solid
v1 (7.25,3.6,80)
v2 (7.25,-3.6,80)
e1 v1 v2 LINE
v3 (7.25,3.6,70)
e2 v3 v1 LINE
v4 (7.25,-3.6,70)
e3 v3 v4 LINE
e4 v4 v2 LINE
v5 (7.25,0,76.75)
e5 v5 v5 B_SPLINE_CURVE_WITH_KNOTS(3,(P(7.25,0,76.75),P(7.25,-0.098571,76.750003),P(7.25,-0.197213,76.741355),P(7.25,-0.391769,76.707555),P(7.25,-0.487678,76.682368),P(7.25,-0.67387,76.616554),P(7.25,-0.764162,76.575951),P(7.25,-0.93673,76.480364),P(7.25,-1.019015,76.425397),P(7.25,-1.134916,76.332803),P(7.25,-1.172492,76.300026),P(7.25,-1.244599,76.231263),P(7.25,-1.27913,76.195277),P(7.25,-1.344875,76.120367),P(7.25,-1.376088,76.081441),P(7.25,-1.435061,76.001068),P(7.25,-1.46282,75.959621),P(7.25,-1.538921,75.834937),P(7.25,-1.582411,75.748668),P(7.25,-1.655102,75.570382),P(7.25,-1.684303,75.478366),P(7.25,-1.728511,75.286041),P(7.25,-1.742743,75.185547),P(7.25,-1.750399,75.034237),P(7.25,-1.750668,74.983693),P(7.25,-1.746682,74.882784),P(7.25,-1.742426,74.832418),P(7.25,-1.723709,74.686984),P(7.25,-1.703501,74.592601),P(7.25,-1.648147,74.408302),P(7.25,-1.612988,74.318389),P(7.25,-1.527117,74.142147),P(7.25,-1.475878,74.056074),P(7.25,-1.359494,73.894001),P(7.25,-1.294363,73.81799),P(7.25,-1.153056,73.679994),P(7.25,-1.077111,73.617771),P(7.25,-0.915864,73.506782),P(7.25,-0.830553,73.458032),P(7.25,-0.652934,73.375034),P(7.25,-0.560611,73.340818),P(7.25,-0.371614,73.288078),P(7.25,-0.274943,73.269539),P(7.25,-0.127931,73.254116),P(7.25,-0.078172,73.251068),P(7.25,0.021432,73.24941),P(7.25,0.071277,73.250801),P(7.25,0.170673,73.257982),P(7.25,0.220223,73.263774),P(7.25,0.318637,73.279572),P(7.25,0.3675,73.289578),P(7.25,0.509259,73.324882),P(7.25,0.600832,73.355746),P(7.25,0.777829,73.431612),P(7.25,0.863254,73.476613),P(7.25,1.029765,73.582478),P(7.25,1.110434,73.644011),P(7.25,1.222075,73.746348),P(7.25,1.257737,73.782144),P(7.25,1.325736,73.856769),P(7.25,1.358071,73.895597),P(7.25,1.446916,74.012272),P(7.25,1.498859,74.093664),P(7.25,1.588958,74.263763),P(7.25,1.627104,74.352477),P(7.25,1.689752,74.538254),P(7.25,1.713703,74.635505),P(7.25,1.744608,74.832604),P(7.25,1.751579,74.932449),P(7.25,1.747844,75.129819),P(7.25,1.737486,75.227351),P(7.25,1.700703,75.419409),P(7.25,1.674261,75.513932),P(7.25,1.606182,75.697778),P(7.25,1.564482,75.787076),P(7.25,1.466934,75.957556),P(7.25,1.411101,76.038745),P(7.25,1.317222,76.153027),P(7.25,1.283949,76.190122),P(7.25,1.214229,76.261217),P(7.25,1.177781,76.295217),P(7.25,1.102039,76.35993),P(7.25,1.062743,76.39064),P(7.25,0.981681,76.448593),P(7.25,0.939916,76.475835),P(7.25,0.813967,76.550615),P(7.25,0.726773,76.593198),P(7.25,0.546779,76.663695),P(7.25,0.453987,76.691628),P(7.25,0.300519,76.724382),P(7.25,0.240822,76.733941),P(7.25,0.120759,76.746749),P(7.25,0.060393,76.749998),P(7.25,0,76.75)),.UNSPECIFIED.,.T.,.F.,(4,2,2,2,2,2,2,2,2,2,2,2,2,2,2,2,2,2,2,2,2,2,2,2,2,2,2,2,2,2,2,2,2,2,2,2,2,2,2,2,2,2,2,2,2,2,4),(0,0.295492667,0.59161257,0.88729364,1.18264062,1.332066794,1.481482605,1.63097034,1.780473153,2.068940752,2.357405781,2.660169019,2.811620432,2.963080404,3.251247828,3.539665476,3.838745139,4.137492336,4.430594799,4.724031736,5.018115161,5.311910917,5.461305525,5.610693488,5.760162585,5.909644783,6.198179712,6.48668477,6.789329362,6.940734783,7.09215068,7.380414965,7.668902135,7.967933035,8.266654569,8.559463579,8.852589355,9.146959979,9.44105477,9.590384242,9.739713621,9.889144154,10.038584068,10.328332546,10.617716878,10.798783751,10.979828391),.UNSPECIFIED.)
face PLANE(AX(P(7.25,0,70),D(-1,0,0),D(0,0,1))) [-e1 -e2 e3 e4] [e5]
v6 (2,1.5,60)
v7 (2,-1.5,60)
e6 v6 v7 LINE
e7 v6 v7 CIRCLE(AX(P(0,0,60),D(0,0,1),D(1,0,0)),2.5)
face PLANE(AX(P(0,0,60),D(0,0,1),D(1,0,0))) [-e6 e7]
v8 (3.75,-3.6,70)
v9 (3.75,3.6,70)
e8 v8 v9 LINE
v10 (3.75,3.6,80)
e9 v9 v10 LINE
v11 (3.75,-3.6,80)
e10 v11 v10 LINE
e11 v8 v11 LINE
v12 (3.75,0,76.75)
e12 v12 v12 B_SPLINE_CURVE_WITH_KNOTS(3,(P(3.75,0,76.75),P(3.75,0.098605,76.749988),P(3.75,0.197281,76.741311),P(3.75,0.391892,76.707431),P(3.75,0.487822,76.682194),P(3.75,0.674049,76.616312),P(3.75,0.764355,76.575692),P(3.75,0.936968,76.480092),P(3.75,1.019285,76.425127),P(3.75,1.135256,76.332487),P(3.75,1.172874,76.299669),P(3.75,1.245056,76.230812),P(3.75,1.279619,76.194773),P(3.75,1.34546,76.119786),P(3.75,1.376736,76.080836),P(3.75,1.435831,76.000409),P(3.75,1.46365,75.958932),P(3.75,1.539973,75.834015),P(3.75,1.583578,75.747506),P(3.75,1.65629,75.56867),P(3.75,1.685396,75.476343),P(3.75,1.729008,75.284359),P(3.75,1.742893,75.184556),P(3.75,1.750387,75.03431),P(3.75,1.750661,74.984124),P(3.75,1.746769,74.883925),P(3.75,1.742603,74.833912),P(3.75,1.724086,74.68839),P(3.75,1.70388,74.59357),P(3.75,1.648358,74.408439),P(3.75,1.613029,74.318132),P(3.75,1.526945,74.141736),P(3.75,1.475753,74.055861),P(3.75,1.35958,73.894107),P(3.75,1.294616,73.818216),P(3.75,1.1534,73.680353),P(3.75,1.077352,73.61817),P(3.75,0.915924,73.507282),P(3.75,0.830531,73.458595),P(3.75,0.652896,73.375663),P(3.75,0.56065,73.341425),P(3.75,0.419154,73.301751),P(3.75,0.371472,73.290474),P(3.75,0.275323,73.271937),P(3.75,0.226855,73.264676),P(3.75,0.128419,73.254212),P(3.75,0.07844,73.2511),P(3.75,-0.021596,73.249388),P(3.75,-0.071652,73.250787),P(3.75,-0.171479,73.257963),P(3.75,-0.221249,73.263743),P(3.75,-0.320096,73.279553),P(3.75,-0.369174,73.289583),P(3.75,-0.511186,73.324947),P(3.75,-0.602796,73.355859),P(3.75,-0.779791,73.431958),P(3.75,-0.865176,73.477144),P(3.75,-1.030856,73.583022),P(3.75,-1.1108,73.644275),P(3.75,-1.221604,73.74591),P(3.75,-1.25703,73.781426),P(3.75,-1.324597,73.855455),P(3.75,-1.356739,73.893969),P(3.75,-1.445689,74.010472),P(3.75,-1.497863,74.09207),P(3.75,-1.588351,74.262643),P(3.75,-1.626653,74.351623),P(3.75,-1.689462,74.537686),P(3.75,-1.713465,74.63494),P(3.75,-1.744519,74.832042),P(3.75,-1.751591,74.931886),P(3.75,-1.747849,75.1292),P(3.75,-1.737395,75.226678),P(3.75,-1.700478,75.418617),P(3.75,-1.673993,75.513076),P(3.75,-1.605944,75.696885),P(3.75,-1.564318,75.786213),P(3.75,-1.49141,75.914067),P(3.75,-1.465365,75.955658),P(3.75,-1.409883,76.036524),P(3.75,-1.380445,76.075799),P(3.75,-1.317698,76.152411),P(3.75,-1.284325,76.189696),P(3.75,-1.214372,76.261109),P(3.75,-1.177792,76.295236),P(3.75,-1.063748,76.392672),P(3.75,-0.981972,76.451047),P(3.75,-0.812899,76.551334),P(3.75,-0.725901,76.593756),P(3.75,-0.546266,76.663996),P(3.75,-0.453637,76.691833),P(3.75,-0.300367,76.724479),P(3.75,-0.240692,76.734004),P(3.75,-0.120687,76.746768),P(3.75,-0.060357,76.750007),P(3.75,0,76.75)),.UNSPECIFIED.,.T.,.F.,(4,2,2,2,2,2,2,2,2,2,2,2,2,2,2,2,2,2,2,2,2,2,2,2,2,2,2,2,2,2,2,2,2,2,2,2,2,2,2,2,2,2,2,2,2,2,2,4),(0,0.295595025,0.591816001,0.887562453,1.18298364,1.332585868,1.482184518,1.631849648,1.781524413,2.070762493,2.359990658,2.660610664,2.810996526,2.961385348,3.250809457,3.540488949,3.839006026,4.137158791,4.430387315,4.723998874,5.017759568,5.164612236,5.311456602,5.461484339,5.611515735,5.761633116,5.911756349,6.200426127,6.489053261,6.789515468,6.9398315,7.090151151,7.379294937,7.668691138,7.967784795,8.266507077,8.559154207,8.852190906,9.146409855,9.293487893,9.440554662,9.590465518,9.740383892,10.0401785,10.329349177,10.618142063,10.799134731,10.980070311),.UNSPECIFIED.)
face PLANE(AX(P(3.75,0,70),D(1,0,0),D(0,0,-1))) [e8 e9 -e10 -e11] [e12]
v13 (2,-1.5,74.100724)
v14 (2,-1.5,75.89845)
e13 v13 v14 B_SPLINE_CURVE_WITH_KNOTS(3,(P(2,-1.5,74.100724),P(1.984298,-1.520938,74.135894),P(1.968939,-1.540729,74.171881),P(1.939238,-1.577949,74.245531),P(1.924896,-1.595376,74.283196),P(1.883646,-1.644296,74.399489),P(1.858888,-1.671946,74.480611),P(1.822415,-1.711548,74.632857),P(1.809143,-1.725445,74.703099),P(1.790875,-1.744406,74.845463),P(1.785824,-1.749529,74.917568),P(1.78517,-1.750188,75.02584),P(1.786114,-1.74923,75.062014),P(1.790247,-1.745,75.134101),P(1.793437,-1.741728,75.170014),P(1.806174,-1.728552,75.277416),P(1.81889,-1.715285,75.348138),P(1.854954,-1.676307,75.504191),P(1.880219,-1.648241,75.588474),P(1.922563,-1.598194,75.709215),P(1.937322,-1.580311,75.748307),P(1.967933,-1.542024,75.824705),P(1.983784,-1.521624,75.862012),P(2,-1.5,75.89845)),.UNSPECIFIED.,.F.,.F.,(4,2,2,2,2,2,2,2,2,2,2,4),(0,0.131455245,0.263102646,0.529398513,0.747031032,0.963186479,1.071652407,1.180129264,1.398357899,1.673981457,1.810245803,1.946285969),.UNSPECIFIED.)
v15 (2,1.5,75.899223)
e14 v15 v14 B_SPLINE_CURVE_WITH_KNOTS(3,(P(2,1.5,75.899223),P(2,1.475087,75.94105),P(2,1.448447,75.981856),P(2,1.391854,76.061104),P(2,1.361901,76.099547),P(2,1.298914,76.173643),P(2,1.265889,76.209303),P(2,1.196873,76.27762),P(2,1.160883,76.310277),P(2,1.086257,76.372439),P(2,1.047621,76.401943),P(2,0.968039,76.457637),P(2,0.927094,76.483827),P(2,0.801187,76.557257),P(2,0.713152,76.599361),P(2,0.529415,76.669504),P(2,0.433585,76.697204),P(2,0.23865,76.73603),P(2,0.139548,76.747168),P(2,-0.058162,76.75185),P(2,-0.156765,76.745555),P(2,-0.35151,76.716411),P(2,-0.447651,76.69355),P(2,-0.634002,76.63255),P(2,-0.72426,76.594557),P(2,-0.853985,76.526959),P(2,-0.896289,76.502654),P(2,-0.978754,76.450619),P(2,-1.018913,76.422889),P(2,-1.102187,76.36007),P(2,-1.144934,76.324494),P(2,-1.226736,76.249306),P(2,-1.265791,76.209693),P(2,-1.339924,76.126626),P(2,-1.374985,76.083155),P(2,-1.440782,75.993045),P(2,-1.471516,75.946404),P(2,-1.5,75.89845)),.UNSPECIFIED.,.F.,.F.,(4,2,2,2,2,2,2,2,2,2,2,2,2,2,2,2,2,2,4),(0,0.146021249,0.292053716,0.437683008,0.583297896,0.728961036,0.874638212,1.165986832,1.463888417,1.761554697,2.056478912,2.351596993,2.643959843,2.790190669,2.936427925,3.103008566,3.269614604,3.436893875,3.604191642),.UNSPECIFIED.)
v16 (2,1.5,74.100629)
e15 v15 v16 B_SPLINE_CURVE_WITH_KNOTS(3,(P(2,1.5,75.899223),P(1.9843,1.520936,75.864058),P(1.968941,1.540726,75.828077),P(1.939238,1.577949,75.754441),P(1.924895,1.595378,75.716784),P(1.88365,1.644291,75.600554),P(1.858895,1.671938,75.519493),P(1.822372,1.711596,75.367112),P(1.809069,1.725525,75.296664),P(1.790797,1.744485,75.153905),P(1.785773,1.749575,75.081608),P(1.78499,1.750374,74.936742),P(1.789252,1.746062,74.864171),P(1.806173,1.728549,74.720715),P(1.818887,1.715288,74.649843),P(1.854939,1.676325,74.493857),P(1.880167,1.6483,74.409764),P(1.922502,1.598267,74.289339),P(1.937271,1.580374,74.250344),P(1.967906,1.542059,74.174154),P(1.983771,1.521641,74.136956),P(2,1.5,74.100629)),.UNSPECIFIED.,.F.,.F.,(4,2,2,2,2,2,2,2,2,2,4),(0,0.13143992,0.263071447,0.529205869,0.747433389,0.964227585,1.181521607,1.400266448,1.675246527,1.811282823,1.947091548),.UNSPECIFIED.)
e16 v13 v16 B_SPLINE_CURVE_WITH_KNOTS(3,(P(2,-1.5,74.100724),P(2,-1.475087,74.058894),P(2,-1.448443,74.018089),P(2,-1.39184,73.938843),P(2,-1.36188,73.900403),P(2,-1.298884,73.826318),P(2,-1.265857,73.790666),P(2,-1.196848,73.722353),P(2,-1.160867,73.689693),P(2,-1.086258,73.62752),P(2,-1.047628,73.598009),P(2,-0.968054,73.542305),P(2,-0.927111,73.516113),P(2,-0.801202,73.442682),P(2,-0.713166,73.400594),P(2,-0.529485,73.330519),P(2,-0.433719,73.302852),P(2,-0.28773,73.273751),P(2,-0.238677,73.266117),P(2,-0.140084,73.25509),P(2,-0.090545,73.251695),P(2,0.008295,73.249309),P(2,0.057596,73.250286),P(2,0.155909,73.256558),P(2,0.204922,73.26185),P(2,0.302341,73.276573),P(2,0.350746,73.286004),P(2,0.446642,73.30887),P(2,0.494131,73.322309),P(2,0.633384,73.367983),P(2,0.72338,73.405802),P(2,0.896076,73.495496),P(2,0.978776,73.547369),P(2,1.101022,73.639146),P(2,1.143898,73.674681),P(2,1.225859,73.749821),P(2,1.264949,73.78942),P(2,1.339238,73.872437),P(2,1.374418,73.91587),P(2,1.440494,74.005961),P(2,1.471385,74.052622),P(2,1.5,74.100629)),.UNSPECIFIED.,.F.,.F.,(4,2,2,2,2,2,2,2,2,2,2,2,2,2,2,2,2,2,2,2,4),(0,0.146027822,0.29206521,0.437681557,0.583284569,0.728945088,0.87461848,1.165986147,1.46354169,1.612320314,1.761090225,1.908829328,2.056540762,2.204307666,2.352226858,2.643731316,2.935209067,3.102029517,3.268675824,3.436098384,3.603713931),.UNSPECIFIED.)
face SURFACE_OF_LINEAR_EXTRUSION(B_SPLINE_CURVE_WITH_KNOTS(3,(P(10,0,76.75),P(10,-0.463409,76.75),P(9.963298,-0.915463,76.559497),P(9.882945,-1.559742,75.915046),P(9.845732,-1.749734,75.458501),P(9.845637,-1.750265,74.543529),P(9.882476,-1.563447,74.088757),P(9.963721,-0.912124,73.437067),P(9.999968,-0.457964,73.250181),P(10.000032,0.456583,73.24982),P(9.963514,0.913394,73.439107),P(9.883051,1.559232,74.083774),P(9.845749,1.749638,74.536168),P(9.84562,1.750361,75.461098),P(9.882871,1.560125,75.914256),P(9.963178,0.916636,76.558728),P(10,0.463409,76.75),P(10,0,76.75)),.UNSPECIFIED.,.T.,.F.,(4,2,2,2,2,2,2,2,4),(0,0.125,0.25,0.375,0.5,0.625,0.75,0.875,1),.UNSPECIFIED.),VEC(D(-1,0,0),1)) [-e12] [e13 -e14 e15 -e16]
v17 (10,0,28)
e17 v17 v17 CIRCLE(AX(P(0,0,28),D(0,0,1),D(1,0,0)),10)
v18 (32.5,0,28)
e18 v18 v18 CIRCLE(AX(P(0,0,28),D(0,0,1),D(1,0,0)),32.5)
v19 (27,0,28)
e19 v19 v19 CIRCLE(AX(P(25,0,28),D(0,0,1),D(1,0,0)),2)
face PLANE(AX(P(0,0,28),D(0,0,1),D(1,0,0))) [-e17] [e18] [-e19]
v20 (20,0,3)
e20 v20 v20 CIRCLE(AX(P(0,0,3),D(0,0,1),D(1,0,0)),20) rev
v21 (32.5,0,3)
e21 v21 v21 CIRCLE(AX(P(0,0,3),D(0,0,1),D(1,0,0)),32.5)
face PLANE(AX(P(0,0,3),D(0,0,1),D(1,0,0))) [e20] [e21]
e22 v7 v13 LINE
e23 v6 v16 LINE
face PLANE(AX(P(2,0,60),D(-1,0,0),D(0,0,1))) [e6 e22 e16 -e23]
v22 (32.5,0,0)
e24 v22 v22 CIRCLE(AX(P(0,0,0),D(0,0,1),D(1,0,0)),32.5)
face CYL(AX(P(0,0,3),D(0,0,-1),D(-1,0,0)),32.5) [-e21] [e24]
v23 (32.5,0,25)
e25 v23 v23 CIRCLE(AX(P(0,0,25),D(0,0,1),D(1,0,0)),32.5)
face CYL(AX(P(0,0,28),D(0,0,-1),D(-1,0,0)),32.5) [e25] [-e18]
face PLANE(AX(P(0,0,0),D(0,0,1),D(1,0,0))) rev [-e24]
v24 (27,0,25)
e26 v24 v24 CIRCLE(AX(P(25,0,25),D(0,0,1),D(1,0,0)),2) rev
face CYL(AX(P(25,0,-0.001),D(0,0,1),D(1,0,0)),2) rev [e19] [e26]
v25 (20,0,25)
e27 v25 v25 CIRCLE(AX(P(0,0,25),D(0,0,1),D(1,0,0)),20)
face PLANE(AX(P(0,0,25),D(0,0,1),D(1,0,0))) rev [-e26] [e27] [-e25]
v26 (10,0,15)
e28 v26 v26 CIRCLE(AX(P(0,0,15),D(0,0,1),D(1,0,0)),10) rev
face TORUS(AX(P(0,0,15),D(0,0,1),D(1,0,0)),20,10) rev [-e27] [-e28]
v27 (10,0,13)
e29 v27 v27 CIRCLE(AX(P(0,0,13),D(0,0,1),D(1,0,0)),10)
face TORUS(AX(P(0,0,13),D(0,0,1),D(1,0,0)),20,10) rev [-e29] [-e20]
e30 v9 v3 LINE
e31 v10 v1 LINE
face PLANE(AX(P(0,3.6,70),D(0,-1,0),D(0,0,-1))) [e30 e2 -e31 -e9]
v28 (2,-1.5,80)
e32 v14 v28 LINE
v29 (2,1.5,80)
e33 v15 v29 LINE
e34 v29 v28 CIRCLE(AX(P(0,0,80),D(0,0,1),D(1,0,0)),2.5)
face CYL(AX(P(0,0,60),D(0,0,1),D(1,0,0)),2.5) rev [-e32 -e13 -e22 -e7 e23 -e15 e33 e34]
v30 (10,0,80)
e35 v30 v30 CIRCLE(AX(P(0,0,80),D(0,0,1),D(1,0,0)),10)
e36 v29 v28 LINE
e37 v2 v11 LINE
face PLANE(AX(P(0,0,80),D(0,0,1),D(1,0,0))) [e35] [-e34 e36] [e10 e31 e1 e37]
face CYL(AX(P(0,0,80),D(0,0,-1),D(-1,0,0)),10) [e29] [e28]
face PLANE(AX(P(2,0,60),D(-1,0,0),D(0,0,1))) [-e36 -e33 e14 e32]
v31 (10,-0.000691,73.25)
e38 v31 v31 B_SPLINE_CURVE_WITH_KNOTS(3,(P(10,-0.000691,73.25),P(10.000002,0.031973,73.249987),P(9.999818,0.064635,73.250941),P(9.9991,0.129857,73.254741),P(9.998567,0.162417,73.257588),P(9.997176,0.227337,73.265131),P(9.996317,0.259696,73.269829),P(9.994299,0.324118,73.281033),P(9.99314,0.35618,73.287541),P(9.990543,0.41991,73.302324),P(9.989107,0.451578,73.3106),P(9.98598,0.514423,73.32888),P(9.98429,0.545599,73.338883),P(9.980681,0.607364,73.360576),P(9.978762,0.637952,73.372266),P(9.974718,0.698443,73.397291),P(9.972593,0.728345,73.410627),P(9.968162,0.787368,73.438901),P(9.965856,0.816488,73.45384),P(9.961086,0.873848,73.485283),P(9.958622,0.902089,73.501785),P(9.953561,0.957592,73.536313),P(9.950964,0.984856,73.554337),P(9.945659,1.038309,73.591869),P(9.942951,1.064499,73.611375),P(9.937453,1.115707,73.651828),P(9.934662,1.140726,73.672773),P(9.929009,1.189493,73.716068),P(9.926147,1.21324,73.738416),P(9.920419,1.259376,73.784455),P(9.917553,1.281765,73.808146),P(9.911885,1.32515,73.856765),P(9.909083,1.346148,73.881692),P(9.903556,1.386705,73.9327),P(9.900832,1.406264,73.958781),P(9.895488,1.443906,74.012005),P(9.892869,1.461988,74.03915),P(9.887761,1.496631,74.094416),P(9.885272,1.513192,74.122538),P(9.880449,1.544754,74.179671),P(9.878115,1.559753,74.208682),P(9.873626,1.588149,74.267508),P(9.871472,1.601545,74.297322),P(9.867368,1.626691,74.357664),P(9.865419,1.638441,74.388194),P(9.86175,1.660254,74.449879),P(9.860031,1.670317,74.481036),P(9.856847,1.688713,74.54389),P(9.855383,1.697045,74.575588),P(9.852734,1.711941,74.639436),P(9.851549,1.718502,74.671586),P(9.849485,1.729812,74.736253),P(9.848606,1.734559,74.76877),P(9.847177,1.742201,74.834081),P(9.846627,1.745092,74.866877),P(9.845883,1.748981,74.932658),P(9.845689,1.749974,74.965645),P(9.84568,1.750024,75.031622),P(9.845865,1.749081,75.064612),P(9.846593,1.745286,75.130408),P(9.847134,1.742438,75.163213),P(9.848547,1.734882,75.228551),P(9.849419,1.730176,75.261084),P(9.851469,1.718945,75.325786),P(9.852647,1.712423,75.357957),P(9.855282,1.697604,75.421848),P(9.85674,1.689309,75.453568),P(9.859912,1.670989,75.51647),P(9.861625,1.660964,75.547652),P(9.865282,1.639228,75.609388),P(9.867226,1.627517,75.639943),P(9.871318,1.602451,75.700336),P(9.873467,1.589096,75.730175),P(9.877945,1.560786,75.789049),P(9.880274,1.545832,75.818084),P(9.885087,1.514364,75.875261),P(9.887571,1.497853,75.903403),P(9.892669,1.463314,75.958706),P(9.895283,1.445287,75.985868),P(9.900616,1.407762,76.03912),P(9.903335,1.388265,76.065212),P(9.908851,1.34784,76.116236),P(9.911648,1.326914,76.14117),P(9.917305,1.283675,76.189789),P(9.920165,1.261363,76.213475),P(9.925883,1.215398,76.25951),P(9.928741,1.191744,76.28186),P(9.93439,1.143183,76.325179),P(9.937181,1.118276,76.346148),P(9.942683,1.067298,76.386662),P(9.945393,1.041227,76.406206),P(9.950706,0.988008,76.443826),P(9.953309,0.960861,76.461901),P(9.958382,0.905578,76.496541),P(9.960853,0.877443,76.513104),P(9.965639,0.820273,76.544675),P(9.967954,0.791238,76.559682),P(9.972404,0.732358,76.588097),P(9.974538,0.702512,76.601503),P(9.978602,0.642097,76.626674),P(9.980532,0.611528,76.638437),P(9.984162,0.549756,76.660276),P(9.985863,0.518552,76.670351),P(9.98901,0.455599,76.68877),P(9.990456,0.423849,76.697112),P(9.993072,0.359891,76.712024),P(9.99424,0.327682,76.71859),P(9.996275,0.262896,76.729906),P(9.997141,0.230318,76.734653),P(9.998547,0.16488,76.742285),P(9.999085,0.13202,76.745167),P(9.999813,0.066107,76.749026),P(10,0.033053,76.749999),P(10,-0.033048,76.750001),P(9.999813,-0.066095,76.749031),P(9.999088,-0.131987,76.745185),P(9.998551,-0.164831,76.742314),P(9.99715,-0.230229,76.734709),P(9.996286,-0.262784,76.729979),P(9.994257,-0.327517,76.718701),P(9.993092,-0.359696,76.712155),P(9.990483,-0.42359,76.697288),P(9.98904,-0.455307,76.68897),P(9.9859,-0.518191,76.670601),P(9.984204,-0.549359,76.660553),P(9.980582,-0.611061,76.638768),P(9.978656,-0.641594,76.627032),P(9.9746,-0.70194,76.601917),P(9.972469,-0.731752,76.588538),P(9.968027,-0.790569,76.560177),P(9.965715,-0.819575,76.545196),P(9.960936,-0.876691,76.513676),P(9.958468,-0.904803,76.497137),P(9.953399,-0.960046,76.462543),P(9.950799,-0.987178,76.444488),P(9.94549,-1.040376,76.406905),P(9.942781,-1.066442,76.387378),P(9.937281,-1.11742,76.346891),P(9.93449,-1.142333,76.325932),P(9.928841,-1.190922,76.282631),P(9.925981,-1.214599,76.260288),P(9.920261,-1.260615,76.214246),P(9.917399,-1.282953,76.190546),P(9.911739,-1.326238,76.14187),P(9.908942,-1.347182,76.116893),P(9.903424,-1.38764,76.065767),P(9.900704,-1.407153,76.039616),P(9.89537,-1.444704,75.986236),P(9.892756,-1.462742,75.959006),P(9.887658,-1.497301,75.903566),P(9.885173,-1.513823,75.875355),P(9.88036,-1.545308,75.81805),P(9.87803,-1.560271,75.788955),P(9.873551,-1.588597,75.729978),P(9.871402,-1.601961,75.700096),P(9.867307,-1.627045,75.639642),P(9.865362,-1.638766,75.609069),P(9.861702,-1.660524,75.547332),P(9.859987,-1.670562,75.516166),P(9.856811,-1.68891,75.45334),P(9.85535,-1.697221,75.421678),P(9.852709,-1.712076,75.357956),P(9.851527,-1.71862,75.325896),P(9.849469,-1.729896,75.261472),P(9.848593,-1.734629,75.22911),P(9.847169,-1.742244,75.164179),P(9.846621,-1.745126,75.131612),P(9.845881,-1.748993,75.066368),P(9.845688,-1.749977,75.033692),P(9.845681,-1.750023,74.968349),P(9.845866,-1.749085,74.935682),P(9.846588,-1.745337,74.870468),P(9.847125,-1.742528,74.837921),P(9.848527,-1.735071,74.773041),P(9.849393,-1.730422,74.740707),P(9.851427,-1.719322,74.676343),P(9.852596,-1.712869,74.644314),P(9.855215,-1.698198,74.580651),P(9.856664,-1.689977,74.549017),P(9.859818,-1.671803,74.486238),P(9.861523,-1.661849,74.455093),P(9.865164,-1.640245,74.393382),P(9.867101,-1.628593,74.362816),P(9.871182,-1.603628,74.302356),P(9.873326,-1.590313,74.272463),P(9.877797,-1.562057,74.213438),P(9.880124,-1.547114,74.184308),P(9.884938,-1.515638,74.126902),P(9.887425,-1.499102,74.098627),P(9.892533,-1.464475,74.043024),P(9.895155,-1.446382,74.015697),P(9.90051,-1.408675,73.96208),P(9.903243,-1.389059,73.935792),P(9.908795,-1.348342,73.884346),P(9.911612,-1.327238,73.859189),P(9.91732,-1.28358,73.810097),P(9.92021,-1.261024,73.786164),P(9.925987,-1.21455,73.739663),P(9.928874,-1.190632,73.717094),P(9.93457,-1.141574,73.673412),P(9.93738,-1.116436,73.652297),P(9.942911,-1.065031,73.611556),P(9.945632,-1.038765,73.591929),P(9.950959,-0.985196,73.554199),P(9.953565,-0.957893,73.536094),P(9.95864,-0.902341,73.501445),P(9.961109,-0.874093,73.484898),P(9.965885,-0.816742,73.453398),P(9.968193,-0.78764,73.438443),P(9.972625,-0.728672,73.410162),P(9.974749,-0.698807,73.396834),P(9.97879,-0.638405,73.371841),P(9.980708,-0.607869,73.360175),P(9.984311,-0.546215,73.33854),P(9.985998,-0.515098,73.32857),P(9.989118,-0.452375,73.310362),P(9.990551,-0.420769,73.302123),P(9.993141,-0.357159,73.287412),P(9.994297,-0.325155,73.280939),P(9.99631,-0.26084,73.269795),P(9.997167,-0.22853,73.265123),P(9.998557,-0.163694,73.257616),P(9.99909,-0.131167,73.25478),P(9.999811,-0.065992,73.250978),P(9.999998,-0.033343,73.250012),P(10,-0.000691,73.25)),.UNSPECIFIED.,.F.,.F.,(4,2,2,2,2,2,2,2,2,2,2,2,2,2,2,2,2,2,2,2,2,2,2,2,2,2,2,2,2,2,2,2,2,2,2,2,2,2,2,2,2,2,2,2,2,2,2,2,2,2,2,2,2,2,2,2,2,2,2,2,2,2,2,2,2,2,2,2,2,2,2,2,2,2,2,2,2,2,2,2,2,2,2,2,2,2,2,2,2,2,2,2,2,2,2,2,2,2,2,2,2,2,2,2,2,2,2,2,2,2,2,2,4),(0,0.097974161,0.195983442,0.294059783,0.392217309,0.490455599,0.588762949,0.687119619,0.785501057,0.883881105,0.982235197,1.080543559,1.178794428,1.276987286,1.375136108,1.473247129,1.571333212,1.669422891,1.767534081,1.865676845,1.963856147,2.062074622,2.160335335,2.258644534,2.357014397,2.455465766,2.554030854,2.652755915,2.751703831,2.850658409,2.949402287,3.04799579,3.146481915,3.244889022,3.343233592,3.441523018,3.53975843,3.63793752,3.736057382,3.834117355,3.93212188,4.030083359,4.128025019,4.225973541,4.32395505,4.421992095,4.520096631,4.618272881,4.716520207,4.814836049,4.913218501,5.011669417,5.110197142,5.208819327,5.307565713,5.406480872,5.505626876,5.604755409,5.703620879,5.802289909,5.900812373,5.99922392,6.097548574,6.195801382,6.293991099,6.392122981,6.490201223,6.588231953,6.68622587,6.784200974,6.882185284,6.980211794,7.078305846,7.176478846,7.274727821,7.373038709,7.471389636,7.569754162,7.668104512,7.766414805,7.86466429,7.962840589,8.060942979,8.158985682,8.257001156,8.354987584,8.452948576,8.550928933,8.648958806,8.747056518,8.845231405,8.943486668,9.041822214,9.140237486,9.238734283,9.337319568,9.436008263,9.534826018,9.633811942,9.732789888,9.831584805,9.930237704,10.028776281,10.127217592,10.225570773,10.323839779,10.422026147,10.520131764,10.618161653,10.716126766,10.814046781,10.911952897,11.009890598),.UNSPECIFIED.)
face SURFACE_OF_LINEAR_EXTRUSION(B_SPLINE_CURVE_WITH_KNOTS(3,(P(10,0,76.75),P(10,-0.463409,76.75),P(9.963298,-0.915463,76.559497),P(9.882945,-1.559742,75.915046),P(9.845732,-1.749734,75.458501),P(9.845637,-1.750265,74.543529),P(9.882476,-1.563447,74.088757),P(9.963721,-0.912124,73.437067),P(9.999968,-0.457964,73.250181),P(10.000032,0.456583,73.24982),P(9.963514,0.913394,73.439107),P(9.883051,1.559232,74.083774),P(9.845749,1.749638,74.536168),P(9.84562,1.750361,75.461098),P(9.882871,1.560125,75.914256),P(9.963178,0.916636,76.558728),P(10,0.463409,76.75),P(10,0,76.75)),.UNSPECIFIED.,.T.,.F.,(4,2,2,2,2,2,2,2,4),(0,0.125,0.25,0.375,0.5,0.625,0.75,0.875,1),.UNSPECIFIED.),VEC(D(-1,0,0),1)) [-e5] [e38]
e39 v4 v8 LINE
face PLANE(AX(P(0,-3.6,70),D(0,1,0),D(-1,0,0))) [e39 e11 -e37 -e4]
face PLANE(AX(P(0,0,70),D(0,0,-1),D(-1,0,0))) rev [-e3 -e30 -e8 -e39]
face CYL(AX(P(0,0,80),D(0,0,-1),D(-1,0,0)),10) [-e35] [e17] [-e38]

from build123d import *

# Parameters (mm, degrees)
CROQUIS1_R              = 10
SALIENTE_EXTRUIR2_DEPTH = 80
CROQUIS4_R              = 32.5
SALIENTE_EXTRUIR3_DEPTH = 3
SALIENTE_EXTRUIR4_START = 25
CROQUIS5_R              = 32.5
SALIENTE_EXTRUIR4_DEPTH = 3
REDONDEO2_R             = 10
CORTAR_EXTRUIR1_START   = 80
CORTAR_EXTRUIR1_DEPTH   = 20
CORTAR_EXTRUIR2_START   = 80
CROQUIS7_W              = 3.5
CROQUIS7_H              = 7.2
CORTAR_EXTRUIR2_DEPTH   = 10
CORTAR_EXTRUIR3_START   = 1.785357468
CORTAR_EXTRUIR3_DEPTH   = 8.214642632
CORTAR_EXTRUIR4_START   = 25
CROQUIS9_R              = 2
CORTAR_EXTRUIR4_DEPTH   = 3


# Read off the part's stored shape, not the designer's step: Cortar-Extruir3
with BuildPart() as part:
    # Croquis1 → Saliente-Extruir2 (new body)
    with BuildSketch(Plane.XY):
        Circle(CROQUIS1_R)
    extrude(amount=SALIENTE_EXTRUIR2_DEPTH)

    # Croquis4 → Saliente-Extruir3 (add)
    with BuildSketch(Plane.XY):
        Circle(CROQUIS4_R)
    extrude(amount=SALIENTE_EXTRUIR3_DEPTH)

    # Croquis5 → Saliente-Extruir4 (add)
    with BuildSketch(Plane.XY.offset(SALIENTE_EXTRUIR4_START)):
        Circle(CROQUIS5_R)
    extrude(amount=SALIENTE_EXTRUIR4_DEPTH)

    # Redondeo2
    redondeo2_edges = [part.edges().sort_by_distance(p)[0] for p in [
        (-10, 0, 25),
        (-10, 0, 3),
    ]]
    fillet(redondeo2_edges, radius=REDONDEO2_R)

    # Croquis6 → Cortar-Extruir1 (cut)
    with BuildSketch(Plane.XY.offset(CORTAR_EXTRUIR1_START)):
        with BuildLine():
            Line((2, 1.5), (2, -1.5))
            ThreePointArc((2, -1.5), (-2.5, 0), (2, 1.5))
        make_face()
    extrude(amount=-CORTAR_EXTRUIR1_DEPTH, mode=Mode.SUBTRACT)

    # Croquis7 → Cortar-Extruir2 (cut)
    with BuildSketch(Plane.XY.offset(CORTAR_EXTRUIR2_START)):
        with Locations((5.5, 0)):
            Rectangle(CROQUIS7_W, CROQUIS7_H)
    extrude(amount=-CORTAR_EXTRUIR2_DEPTH, mode=Mode.SUBTRACT)

    # Cortar-Extruir3 outline → Cortar-Extruir3 (cut)
    with BuildSketch(Plane(origin=(0, 0, 0), x_dir=(0, 0, -1), z_dir=(1, 0, 0)).offset(CORTAR_EXTRUIR3_START)):
        with BuildLine():
            add(Edge.make_bspline(
                [(-73.250000008, 0), (-73.250010298, 0.457042806), (-73.439269311, 0.913556657), (-73.761440573, 1.236313288), (-74.083774062, 1.559232356), (-74.536167707, 1.749638189), (-74.998632957, 1.749999466), (-75.46109828, 1.75036072), (-75.914256207, 1.560125437), (-76.558728463, 0.916635921), (-76.75, 0.463408547), (-76.75, -0.463408547), (-76.559497121, -0.915462775), (-75.915045576, -1.559741953), (-75.458501248, -1.749734355), (-74.543528816, -1.750265056), (-74.088756627, -1.563446648), (-73.437067231, -0.912124478), (-73.250180582, -0.457964068), (-73.250000045, -0.000460382), (-73.250000003, -0.000230191), (-73.250000008, 0)],
                knots=[0.500062925, 0.500062925, 0.500062925, 0.500062925, 0.625, 0.625, 0.625000034, 0.750000005, 0.750000005, 0.750000019, 0.875000002, 0.875000002, 0.999999997, 0.999999997, 1.124999993, 1.124999993, 1.24999999, 1.24999999, 1.374999987, 1.374999987, 1.499999981, 1.499999981, 1.500062906, 1.500062906, 1.500062906, 1.500062906], degree=3))
        make_face()
    extrude(amount=CORTAR_EXTRUIR3_DEPTH, mode=Mode.SUBTRACT)

    # Croquis9 → Cortar-Extruir4 (cut)
    with BuildSketch(Plane.XY.offset(CORTAR_EXTRUIR4_START)):
        with Locations((25, 0)):
            Circle(CROQUIS9_R)
    extrude(amount=CORTAR_EXTRUIR4_DEPTH, mode=Mode.SUBTRACT)


solid = part.part
